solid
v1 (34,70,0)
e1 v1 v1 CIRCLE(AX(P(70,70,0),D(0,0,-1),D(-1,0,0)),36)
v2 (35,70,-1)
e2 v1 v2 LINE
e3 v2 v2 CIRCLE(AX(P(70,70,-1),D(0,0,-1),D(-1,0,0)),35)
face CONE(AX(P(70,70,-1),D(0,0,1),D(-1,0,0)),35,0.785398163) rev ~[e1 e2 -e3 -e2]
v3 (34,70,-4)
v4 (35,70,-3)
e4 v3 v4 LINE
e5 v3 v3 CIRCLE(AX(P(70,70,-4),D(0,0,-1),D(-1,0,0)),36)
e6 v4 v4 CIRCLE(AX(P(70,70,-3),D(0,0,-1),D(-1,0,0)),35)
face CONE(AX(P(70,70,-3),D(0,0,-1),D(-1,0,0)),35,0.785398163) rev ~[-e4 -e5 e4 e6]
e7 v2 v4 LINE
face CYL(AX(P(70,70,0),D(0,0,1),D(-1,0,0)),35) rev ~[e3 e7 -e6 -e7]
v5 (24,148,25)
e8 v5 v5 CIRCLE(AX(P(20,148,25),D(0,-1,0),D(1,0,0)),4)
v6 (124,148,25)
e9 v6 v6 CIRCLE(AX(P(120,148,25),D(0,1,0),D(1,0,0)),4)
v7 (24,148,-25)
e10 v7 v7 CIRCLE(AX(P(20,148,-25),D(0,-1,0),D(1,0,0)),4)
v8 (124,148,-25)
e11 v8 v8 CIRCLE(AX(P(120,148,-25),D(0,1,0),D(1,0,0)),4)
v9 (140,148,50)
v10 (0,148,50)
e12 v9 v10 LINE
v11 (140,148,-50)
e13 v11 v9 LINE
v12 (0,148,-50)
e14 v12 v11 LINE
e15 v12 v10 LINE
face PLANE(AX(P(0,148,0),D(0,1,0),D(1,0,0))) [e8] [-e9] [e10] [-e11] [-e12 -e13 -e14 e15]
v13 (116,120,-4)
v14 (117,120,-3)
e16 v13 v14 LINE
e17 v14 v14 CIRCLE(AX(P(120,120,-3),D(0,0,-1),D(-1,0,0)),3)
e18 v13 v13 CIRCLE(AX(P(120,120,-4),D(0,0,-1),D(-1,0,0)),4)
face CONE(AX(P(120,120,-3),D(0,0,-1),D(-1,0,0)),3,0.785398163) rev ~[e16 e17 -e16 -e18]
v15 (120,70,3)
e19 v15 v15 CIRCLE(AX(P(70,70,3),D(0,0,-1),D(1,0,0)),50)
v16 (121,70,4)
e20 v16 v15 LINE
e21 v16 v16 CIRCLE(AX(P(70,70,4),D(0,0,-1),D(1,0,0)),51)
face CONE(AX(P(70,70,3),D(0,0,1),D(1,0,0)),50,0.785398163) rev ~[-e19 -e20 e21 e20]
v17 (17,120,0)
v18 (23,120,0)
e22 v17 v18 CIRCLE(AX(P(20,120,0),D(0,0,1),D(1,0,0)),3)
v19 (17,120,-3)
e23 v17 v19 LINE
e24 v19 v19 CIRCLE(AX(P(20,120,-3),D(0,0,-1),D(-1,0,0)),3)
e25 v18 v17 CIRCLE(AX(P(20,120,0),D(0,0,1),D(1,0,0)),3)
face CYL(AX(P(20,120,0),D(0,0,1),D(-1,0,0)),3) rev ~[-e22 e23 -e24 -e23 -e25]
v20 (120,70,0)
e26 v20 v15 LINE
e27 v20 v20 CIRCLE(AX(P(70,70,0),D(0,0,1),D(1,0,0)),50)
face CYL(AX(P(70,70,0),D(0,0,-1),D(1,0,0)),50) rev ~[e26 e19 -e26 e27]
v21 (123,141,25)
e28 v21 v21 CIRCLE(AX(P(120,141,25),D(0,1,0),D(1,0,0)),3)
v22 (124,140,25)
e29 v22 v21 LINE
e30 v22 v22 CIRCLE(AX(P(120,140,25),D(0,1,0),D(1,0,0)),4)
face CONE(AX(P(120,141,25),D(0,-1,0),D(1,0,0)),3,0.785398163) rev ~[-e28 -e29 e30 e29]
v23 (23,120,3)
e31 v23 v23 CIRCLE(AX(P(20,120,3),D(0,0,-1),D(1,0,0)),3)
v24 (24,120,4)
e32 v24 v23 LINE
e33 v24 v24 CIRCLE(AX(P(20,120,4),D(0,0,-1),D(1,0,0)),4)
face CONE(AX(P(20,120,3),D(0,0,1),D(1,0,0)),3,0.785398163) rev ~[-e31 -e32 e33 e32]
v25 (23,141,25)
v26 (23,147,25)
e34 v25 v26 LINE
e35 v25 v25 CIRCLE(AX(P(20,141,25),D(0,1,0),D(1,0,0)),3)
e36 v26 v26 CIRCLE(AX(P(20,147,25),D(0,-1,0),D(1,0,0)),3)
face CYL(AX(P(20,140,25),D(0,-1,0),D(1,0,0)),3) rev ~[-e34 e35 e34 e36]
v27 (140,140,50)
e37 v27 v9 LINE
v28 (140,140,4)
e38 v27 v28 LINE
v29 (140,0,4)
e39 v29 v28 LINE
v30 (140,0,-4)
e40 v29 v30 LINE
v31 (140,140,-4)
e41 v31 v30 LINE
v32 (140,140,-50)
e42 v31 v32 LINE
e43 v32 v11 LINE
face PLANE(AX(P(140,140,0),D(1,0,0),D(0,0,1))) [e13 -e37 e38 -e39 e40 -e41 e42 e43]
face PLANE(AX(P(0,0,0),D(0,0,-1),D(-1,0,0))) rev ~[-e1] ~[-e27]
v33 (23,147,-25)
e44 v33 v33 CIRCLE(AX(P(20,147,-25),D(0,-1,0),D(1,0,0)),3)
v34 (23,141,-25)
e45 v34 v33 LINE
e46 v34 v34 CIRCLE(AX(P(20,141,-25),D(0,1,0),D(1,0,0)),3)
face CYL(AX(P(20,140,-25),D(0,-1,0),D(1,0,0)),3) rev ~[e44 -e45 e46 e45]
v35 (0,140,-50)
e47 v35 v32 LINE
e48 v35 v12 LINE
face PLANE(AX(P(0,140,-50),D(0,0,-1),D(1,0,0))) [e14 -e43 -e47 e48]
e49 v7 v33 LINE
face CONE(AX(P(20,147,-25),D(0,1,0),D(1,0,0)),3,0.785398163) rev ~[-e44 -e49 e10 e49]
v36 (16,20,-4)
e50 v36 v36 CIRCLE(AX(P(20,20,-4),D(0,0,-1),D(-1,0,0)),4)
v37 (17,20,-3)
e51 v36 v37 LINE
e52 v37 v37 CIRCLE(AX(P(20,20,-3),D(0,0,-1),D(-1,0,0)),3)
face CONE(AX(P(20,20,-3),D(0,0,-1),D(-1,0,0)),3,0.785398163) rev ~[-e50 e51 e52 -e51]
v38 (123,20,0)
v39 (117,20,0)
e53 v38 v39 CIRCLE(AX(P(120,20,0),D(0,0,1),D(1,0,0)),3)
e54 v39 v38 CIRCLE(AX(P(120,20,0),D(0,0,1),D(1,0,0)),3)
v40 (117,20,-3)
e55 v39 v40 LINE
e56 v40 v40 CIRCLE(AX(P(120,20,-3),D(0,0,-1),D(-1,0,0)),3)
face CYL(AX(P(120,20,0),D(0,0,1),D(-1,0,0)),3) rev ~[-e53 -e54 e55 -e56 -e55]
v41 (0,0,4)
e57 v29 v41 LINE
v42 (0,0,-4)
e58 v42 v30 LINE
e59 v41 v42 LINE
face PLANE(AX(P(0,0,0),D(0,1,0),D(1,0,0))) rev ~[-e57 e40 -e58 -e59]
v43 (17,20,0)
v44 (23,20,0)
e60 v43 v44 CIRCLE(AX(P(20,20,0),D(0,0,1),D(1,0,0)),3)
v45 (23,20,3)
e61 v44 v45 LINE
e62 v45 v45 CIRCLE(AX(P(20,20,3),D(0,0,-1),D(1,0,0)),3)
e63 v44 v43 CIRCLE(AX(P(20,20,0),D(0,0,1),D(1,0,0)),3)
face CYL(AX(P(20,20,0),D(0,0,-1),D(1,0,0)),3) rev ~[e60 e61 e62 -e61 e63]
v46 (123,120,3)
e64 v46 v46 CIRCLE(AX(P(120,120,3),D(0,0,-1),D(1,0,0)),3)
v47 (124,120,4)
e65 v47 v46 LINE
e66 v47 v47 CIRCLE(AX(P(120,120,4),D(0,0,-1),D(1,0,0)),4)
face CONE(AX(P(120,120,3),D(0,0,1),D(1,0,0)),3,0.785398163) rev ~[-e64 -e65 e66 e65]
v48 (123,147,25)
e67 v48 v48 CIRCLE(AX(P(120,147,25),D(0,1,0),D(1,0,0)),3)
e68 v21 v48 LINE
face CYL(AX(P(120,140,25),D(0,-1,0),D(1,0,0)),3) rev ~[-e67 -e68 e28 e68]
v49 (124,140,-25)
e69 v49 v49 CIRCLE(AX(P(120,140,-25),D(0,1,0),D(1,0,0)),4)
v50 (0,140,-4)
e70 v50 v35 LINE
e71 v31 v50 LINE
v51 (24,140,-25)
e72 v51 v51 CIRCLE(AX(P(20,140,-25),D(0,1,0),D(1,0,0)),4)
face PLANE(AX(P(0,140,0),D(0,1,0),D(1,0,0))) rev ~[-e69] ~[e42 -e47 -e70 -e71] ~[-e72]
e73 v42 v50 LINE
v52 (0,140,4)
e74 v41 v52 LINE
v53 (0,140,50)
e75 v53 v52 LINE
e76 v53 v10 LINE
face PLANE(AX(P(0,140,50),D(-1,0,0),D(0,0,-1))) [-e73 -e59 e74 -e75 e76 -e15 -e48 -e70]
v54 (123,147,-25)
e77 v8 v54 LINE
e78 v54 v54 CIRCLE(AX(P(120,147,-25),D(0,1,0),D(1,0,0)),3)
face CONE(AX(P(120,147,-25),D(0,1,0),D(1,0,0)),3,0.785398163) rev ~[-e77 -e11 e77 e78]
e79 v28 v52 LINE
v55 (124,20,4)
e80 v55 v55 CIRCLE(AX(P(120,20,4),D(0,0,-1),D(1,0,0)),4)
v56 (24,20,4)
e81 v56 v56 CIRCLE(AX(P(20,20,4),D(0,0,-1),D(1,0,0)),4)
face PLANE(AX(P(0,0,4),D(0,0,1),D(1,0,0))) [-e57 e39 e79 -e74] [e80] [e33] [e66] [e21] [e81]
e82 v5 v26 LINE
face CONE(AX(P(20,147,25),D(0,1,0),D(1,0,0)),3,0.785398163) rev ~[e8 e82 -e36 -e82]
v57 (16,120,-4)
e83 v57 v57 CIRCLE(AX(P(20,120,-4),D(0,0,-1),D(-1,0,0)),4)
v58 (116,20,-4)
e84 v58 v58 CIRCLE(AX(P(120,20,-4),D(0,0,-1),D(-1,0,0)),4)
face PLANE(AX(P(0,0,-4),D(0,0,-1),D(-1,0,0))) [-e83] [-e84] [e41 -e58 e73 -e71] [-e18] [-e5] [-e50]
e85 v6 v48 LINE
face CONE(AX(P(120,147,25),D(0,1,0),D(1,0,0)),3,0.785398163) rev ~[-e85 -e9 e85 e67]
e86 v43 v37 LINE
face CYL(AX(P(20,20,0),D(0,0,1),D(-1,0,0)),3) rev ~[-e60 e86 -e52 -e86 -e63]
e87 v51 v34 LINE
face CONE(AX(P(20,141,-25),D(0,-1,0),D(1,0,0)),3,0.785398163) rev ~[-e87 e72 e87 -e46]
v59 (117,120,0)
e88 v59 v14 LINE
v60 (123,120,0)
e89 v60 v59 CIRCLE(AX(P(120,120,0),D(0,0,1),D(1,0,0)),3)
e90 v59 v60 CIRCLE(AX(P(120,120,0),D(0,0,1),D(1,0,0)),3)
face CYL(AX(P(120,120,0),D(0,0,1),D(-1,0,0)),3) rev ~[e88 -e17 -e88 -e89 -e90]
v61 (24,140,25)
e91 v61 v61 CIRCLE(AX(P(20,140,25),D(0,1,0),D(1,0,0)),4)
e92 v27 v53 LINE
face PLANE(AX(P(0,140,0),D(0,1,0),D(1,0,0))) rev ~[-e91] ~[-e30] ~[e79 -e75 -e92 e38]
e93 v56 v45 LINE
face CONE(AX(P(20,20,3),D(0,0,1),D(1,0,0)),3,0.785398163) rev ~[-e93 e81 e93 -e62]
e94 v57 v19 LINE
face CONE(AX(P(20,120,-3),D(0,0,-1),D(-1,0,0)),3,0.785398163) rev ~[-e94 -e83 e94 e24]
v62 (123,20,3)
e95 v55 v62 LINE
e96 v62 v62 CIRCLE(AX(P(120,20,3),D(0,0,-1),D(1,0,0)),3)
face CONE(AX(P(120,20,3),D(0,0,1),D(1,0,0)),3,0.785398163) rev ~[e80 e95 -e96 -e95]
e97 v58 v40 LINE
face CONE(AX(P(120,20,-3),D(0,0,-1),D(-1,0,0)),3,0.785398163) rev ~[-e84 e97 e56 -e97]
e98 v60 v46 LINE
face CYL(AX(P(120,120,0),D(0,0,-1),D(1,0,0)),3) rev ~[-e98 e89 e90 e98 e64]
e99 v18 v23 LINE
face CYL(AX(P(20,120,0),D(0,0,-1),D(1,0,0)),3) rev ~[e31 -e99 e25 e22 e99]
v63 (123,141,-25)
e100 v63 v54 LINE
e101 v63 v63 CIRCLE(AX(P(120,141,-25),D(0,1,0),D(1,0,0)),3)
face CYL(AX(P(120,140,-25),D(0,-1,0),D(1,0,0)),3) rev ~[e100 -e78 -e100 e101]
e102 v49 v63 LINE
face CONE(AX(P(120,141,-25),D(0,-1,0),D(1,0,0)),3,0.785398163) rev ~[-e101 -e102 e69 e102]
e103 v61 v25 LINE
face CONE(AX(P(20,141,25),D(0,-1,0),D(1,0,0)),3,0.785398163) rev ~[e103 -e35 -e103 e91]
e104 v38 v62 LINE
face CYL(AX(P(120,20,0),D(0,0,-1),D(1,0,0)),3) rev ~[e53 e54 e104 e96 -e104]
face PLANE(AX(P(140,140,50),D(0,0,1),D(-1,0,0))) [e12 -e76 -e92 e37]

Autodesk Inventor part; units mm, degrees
ref_plane "YZ Plane" through (0, 0, 0) normal (1, 0, 0) x (0, 1, 0)
ref_plane "XZ Plane" through (0, 0, 0) normal (0, 1, 0) x (-1, 0, 0)
ref_plane "XY Plane" through (0, 0, 0) normal (0, 0, 1) x (1, 0, 0)
sketch "Эскиз1" plane through (0, 0, 0) normal (0, 0, 1) x (1, 0, 0)
  line L0 (0, 0) -> (140, 0)
  line L1 (140, 0) -> (140, 140)
  line L2 (140, 140) -> (0, 140)
  line L3 (0, 140) -> (0, 0)
  circle A0 centre (70, 70) radius 50
  line L4 (0, 140) -> (20, 140)
  line L5 (20, 140) -> (20, 120)
  line L6 (140, 0) -> (140, 20)
  line L7 (140, 20) -> (120, 20)
  line L8 (20, 120) -> (120, 120)
  line L9 (120, 120) -> (120, 20)
  line L10 (120, 20) -> (20, 20)
  line L11 (20, 20) -> (20, 120)
  line L12 (70, 70) -> (0, 70)
  line L13 (0, 70) -> (0, 0)
  line L14 (0, 0) -> (70, 0)
  line L15 (70, 0) -> (70, 70)
  circle A1 centre (20, 120) radius 3
  circle A2 centre (120, 120) radius 3
  circle A3 centre (120, 20) radius 3
  circle A4 centre (20, 20) radius 3
  dimension "d0" = 140
  dimension "d1" = 140
  dimension "d2" = 100
  dimension "d3" = 20
  dimension "d4" = 20
  dimension "d5" = 20
  dimension "d6" = 20
  dimension "d7" = 70
  dimension "d8" = 70
  dimension "d9" = 6
  dimension "d10" = 6
  dimension "d11" = 6
  dimension "d14" = 6
extrude "Выдавливание1" add sketch "Эскиз1" along normal blind 4 contours L3 L12 L11 A4 L10 L15 L0 | L15 L10 A3 L7 L1 L0 | L3 L2 L5 A1 L11 L12 | L10 A4 L11 A0 | A0 L9 A3 L10 | L11 A1 L8 A0 | L7 A3 L9 A2 L8 A1 L5 L2 L1 | A0 L8 A2 L9
sketch "Эскиз2" plane through (0, 140, 0) normal (0, 1, 0) x (1, 0, 0)
  line L0 (0, 0) -> (0, -4) projected
  line L1 (0, 0) -> (140, 0)
  line L2 (140, 0) -> (140, -50)
  line L3 (140, -50) -> (0, -50)
  line L4 (0, -50) -> (0, 0)
  line L5 (0, -25) -> (20, -25)
  line L6 (140, -25) -> (120, -25)
  circle A0 centre (120, -25) radius 3
  circle A1 centre (20, -25) radius 3
  line L7 (140, 0) -> (0, 0)
  line L8 (0, 0) -> (0, 50)
  line L9 (0, 50) -> (140, 50)
  line L10 (140, 50) -> (140, 0)
  line L11 (140, 25) -> (120, 25)
  circle A2 centre (120, 25) radius 3
  circle A3 centre (20, 25) radius 3
  line L12 (0, 25) -> (20, 25)
  point P0 (0, -4)
  point P1 (0, 0)
  dimension "d15" = 140
  dimension "d16" = 50
  dimension "d17" = 20
  dimension "d18" = 20
  dimension "d19" = 6
  dimension "d20" = 6
  dimension "d23" = 140
  dimension "d24" = 50
  dimension "d25" = 6
  dimension "d26" = 6
  dimension "d30" = 20
extrude "Выдавливание2" add sketch "Эскиз2" along normal blind 8
sketch "Эскиз3" plane through (0, 0, 0) normal (0, 0, -1) x (-1, 0, 0)
  line L0 (0, 0) -> (-140, 0) projected
  line L1 (-140, 140) -> (0, 140) projected
  line L2 (-140, 0) -> (0, 0)
  line L3 (0, 0) -> (0, 140)
  line L4 (0, 140) -> (-140, 140)
  line L5 (-140, 140) -> (-140, 0)
  circle A0 centre (-120, 20) radius 3 projected
  circle A1 centre (-120, 120) radius 3 projected
  circle A2 centre (-20, 120) radius 3 projected
  circle A3 centre (-20, 20) radius 3 projected
  circle A4 centre (-70, 70) radius 35
  circle A5 centre (-70, 70) radius 50 projected
  dimension "d27" = 70
extrude "Выдавливание3" add sketch "Эскиз3" along normal blind 4 contours L0 L5 L1 L3 | A5
chamfer "Фаска1" distance 1 angle 45 19 edges at (23, 20, -4) (105, 70, -4) (123, 20, -4) (123, 120, -4) (117, 140, -25) (17, 140, -25) (23, 120, -4) (20, 70, 4) (105, 70, 0) (117, 120, 4) (117, 140, 25) (17, 140, 25) (17, 120, 4) (17, 20, 4) (117, 20, 4) (17, 148, 25) (17, 148, -25) (117, 148, 25) (117, 148, -25)
properties part number "Кронштейн мотора"
